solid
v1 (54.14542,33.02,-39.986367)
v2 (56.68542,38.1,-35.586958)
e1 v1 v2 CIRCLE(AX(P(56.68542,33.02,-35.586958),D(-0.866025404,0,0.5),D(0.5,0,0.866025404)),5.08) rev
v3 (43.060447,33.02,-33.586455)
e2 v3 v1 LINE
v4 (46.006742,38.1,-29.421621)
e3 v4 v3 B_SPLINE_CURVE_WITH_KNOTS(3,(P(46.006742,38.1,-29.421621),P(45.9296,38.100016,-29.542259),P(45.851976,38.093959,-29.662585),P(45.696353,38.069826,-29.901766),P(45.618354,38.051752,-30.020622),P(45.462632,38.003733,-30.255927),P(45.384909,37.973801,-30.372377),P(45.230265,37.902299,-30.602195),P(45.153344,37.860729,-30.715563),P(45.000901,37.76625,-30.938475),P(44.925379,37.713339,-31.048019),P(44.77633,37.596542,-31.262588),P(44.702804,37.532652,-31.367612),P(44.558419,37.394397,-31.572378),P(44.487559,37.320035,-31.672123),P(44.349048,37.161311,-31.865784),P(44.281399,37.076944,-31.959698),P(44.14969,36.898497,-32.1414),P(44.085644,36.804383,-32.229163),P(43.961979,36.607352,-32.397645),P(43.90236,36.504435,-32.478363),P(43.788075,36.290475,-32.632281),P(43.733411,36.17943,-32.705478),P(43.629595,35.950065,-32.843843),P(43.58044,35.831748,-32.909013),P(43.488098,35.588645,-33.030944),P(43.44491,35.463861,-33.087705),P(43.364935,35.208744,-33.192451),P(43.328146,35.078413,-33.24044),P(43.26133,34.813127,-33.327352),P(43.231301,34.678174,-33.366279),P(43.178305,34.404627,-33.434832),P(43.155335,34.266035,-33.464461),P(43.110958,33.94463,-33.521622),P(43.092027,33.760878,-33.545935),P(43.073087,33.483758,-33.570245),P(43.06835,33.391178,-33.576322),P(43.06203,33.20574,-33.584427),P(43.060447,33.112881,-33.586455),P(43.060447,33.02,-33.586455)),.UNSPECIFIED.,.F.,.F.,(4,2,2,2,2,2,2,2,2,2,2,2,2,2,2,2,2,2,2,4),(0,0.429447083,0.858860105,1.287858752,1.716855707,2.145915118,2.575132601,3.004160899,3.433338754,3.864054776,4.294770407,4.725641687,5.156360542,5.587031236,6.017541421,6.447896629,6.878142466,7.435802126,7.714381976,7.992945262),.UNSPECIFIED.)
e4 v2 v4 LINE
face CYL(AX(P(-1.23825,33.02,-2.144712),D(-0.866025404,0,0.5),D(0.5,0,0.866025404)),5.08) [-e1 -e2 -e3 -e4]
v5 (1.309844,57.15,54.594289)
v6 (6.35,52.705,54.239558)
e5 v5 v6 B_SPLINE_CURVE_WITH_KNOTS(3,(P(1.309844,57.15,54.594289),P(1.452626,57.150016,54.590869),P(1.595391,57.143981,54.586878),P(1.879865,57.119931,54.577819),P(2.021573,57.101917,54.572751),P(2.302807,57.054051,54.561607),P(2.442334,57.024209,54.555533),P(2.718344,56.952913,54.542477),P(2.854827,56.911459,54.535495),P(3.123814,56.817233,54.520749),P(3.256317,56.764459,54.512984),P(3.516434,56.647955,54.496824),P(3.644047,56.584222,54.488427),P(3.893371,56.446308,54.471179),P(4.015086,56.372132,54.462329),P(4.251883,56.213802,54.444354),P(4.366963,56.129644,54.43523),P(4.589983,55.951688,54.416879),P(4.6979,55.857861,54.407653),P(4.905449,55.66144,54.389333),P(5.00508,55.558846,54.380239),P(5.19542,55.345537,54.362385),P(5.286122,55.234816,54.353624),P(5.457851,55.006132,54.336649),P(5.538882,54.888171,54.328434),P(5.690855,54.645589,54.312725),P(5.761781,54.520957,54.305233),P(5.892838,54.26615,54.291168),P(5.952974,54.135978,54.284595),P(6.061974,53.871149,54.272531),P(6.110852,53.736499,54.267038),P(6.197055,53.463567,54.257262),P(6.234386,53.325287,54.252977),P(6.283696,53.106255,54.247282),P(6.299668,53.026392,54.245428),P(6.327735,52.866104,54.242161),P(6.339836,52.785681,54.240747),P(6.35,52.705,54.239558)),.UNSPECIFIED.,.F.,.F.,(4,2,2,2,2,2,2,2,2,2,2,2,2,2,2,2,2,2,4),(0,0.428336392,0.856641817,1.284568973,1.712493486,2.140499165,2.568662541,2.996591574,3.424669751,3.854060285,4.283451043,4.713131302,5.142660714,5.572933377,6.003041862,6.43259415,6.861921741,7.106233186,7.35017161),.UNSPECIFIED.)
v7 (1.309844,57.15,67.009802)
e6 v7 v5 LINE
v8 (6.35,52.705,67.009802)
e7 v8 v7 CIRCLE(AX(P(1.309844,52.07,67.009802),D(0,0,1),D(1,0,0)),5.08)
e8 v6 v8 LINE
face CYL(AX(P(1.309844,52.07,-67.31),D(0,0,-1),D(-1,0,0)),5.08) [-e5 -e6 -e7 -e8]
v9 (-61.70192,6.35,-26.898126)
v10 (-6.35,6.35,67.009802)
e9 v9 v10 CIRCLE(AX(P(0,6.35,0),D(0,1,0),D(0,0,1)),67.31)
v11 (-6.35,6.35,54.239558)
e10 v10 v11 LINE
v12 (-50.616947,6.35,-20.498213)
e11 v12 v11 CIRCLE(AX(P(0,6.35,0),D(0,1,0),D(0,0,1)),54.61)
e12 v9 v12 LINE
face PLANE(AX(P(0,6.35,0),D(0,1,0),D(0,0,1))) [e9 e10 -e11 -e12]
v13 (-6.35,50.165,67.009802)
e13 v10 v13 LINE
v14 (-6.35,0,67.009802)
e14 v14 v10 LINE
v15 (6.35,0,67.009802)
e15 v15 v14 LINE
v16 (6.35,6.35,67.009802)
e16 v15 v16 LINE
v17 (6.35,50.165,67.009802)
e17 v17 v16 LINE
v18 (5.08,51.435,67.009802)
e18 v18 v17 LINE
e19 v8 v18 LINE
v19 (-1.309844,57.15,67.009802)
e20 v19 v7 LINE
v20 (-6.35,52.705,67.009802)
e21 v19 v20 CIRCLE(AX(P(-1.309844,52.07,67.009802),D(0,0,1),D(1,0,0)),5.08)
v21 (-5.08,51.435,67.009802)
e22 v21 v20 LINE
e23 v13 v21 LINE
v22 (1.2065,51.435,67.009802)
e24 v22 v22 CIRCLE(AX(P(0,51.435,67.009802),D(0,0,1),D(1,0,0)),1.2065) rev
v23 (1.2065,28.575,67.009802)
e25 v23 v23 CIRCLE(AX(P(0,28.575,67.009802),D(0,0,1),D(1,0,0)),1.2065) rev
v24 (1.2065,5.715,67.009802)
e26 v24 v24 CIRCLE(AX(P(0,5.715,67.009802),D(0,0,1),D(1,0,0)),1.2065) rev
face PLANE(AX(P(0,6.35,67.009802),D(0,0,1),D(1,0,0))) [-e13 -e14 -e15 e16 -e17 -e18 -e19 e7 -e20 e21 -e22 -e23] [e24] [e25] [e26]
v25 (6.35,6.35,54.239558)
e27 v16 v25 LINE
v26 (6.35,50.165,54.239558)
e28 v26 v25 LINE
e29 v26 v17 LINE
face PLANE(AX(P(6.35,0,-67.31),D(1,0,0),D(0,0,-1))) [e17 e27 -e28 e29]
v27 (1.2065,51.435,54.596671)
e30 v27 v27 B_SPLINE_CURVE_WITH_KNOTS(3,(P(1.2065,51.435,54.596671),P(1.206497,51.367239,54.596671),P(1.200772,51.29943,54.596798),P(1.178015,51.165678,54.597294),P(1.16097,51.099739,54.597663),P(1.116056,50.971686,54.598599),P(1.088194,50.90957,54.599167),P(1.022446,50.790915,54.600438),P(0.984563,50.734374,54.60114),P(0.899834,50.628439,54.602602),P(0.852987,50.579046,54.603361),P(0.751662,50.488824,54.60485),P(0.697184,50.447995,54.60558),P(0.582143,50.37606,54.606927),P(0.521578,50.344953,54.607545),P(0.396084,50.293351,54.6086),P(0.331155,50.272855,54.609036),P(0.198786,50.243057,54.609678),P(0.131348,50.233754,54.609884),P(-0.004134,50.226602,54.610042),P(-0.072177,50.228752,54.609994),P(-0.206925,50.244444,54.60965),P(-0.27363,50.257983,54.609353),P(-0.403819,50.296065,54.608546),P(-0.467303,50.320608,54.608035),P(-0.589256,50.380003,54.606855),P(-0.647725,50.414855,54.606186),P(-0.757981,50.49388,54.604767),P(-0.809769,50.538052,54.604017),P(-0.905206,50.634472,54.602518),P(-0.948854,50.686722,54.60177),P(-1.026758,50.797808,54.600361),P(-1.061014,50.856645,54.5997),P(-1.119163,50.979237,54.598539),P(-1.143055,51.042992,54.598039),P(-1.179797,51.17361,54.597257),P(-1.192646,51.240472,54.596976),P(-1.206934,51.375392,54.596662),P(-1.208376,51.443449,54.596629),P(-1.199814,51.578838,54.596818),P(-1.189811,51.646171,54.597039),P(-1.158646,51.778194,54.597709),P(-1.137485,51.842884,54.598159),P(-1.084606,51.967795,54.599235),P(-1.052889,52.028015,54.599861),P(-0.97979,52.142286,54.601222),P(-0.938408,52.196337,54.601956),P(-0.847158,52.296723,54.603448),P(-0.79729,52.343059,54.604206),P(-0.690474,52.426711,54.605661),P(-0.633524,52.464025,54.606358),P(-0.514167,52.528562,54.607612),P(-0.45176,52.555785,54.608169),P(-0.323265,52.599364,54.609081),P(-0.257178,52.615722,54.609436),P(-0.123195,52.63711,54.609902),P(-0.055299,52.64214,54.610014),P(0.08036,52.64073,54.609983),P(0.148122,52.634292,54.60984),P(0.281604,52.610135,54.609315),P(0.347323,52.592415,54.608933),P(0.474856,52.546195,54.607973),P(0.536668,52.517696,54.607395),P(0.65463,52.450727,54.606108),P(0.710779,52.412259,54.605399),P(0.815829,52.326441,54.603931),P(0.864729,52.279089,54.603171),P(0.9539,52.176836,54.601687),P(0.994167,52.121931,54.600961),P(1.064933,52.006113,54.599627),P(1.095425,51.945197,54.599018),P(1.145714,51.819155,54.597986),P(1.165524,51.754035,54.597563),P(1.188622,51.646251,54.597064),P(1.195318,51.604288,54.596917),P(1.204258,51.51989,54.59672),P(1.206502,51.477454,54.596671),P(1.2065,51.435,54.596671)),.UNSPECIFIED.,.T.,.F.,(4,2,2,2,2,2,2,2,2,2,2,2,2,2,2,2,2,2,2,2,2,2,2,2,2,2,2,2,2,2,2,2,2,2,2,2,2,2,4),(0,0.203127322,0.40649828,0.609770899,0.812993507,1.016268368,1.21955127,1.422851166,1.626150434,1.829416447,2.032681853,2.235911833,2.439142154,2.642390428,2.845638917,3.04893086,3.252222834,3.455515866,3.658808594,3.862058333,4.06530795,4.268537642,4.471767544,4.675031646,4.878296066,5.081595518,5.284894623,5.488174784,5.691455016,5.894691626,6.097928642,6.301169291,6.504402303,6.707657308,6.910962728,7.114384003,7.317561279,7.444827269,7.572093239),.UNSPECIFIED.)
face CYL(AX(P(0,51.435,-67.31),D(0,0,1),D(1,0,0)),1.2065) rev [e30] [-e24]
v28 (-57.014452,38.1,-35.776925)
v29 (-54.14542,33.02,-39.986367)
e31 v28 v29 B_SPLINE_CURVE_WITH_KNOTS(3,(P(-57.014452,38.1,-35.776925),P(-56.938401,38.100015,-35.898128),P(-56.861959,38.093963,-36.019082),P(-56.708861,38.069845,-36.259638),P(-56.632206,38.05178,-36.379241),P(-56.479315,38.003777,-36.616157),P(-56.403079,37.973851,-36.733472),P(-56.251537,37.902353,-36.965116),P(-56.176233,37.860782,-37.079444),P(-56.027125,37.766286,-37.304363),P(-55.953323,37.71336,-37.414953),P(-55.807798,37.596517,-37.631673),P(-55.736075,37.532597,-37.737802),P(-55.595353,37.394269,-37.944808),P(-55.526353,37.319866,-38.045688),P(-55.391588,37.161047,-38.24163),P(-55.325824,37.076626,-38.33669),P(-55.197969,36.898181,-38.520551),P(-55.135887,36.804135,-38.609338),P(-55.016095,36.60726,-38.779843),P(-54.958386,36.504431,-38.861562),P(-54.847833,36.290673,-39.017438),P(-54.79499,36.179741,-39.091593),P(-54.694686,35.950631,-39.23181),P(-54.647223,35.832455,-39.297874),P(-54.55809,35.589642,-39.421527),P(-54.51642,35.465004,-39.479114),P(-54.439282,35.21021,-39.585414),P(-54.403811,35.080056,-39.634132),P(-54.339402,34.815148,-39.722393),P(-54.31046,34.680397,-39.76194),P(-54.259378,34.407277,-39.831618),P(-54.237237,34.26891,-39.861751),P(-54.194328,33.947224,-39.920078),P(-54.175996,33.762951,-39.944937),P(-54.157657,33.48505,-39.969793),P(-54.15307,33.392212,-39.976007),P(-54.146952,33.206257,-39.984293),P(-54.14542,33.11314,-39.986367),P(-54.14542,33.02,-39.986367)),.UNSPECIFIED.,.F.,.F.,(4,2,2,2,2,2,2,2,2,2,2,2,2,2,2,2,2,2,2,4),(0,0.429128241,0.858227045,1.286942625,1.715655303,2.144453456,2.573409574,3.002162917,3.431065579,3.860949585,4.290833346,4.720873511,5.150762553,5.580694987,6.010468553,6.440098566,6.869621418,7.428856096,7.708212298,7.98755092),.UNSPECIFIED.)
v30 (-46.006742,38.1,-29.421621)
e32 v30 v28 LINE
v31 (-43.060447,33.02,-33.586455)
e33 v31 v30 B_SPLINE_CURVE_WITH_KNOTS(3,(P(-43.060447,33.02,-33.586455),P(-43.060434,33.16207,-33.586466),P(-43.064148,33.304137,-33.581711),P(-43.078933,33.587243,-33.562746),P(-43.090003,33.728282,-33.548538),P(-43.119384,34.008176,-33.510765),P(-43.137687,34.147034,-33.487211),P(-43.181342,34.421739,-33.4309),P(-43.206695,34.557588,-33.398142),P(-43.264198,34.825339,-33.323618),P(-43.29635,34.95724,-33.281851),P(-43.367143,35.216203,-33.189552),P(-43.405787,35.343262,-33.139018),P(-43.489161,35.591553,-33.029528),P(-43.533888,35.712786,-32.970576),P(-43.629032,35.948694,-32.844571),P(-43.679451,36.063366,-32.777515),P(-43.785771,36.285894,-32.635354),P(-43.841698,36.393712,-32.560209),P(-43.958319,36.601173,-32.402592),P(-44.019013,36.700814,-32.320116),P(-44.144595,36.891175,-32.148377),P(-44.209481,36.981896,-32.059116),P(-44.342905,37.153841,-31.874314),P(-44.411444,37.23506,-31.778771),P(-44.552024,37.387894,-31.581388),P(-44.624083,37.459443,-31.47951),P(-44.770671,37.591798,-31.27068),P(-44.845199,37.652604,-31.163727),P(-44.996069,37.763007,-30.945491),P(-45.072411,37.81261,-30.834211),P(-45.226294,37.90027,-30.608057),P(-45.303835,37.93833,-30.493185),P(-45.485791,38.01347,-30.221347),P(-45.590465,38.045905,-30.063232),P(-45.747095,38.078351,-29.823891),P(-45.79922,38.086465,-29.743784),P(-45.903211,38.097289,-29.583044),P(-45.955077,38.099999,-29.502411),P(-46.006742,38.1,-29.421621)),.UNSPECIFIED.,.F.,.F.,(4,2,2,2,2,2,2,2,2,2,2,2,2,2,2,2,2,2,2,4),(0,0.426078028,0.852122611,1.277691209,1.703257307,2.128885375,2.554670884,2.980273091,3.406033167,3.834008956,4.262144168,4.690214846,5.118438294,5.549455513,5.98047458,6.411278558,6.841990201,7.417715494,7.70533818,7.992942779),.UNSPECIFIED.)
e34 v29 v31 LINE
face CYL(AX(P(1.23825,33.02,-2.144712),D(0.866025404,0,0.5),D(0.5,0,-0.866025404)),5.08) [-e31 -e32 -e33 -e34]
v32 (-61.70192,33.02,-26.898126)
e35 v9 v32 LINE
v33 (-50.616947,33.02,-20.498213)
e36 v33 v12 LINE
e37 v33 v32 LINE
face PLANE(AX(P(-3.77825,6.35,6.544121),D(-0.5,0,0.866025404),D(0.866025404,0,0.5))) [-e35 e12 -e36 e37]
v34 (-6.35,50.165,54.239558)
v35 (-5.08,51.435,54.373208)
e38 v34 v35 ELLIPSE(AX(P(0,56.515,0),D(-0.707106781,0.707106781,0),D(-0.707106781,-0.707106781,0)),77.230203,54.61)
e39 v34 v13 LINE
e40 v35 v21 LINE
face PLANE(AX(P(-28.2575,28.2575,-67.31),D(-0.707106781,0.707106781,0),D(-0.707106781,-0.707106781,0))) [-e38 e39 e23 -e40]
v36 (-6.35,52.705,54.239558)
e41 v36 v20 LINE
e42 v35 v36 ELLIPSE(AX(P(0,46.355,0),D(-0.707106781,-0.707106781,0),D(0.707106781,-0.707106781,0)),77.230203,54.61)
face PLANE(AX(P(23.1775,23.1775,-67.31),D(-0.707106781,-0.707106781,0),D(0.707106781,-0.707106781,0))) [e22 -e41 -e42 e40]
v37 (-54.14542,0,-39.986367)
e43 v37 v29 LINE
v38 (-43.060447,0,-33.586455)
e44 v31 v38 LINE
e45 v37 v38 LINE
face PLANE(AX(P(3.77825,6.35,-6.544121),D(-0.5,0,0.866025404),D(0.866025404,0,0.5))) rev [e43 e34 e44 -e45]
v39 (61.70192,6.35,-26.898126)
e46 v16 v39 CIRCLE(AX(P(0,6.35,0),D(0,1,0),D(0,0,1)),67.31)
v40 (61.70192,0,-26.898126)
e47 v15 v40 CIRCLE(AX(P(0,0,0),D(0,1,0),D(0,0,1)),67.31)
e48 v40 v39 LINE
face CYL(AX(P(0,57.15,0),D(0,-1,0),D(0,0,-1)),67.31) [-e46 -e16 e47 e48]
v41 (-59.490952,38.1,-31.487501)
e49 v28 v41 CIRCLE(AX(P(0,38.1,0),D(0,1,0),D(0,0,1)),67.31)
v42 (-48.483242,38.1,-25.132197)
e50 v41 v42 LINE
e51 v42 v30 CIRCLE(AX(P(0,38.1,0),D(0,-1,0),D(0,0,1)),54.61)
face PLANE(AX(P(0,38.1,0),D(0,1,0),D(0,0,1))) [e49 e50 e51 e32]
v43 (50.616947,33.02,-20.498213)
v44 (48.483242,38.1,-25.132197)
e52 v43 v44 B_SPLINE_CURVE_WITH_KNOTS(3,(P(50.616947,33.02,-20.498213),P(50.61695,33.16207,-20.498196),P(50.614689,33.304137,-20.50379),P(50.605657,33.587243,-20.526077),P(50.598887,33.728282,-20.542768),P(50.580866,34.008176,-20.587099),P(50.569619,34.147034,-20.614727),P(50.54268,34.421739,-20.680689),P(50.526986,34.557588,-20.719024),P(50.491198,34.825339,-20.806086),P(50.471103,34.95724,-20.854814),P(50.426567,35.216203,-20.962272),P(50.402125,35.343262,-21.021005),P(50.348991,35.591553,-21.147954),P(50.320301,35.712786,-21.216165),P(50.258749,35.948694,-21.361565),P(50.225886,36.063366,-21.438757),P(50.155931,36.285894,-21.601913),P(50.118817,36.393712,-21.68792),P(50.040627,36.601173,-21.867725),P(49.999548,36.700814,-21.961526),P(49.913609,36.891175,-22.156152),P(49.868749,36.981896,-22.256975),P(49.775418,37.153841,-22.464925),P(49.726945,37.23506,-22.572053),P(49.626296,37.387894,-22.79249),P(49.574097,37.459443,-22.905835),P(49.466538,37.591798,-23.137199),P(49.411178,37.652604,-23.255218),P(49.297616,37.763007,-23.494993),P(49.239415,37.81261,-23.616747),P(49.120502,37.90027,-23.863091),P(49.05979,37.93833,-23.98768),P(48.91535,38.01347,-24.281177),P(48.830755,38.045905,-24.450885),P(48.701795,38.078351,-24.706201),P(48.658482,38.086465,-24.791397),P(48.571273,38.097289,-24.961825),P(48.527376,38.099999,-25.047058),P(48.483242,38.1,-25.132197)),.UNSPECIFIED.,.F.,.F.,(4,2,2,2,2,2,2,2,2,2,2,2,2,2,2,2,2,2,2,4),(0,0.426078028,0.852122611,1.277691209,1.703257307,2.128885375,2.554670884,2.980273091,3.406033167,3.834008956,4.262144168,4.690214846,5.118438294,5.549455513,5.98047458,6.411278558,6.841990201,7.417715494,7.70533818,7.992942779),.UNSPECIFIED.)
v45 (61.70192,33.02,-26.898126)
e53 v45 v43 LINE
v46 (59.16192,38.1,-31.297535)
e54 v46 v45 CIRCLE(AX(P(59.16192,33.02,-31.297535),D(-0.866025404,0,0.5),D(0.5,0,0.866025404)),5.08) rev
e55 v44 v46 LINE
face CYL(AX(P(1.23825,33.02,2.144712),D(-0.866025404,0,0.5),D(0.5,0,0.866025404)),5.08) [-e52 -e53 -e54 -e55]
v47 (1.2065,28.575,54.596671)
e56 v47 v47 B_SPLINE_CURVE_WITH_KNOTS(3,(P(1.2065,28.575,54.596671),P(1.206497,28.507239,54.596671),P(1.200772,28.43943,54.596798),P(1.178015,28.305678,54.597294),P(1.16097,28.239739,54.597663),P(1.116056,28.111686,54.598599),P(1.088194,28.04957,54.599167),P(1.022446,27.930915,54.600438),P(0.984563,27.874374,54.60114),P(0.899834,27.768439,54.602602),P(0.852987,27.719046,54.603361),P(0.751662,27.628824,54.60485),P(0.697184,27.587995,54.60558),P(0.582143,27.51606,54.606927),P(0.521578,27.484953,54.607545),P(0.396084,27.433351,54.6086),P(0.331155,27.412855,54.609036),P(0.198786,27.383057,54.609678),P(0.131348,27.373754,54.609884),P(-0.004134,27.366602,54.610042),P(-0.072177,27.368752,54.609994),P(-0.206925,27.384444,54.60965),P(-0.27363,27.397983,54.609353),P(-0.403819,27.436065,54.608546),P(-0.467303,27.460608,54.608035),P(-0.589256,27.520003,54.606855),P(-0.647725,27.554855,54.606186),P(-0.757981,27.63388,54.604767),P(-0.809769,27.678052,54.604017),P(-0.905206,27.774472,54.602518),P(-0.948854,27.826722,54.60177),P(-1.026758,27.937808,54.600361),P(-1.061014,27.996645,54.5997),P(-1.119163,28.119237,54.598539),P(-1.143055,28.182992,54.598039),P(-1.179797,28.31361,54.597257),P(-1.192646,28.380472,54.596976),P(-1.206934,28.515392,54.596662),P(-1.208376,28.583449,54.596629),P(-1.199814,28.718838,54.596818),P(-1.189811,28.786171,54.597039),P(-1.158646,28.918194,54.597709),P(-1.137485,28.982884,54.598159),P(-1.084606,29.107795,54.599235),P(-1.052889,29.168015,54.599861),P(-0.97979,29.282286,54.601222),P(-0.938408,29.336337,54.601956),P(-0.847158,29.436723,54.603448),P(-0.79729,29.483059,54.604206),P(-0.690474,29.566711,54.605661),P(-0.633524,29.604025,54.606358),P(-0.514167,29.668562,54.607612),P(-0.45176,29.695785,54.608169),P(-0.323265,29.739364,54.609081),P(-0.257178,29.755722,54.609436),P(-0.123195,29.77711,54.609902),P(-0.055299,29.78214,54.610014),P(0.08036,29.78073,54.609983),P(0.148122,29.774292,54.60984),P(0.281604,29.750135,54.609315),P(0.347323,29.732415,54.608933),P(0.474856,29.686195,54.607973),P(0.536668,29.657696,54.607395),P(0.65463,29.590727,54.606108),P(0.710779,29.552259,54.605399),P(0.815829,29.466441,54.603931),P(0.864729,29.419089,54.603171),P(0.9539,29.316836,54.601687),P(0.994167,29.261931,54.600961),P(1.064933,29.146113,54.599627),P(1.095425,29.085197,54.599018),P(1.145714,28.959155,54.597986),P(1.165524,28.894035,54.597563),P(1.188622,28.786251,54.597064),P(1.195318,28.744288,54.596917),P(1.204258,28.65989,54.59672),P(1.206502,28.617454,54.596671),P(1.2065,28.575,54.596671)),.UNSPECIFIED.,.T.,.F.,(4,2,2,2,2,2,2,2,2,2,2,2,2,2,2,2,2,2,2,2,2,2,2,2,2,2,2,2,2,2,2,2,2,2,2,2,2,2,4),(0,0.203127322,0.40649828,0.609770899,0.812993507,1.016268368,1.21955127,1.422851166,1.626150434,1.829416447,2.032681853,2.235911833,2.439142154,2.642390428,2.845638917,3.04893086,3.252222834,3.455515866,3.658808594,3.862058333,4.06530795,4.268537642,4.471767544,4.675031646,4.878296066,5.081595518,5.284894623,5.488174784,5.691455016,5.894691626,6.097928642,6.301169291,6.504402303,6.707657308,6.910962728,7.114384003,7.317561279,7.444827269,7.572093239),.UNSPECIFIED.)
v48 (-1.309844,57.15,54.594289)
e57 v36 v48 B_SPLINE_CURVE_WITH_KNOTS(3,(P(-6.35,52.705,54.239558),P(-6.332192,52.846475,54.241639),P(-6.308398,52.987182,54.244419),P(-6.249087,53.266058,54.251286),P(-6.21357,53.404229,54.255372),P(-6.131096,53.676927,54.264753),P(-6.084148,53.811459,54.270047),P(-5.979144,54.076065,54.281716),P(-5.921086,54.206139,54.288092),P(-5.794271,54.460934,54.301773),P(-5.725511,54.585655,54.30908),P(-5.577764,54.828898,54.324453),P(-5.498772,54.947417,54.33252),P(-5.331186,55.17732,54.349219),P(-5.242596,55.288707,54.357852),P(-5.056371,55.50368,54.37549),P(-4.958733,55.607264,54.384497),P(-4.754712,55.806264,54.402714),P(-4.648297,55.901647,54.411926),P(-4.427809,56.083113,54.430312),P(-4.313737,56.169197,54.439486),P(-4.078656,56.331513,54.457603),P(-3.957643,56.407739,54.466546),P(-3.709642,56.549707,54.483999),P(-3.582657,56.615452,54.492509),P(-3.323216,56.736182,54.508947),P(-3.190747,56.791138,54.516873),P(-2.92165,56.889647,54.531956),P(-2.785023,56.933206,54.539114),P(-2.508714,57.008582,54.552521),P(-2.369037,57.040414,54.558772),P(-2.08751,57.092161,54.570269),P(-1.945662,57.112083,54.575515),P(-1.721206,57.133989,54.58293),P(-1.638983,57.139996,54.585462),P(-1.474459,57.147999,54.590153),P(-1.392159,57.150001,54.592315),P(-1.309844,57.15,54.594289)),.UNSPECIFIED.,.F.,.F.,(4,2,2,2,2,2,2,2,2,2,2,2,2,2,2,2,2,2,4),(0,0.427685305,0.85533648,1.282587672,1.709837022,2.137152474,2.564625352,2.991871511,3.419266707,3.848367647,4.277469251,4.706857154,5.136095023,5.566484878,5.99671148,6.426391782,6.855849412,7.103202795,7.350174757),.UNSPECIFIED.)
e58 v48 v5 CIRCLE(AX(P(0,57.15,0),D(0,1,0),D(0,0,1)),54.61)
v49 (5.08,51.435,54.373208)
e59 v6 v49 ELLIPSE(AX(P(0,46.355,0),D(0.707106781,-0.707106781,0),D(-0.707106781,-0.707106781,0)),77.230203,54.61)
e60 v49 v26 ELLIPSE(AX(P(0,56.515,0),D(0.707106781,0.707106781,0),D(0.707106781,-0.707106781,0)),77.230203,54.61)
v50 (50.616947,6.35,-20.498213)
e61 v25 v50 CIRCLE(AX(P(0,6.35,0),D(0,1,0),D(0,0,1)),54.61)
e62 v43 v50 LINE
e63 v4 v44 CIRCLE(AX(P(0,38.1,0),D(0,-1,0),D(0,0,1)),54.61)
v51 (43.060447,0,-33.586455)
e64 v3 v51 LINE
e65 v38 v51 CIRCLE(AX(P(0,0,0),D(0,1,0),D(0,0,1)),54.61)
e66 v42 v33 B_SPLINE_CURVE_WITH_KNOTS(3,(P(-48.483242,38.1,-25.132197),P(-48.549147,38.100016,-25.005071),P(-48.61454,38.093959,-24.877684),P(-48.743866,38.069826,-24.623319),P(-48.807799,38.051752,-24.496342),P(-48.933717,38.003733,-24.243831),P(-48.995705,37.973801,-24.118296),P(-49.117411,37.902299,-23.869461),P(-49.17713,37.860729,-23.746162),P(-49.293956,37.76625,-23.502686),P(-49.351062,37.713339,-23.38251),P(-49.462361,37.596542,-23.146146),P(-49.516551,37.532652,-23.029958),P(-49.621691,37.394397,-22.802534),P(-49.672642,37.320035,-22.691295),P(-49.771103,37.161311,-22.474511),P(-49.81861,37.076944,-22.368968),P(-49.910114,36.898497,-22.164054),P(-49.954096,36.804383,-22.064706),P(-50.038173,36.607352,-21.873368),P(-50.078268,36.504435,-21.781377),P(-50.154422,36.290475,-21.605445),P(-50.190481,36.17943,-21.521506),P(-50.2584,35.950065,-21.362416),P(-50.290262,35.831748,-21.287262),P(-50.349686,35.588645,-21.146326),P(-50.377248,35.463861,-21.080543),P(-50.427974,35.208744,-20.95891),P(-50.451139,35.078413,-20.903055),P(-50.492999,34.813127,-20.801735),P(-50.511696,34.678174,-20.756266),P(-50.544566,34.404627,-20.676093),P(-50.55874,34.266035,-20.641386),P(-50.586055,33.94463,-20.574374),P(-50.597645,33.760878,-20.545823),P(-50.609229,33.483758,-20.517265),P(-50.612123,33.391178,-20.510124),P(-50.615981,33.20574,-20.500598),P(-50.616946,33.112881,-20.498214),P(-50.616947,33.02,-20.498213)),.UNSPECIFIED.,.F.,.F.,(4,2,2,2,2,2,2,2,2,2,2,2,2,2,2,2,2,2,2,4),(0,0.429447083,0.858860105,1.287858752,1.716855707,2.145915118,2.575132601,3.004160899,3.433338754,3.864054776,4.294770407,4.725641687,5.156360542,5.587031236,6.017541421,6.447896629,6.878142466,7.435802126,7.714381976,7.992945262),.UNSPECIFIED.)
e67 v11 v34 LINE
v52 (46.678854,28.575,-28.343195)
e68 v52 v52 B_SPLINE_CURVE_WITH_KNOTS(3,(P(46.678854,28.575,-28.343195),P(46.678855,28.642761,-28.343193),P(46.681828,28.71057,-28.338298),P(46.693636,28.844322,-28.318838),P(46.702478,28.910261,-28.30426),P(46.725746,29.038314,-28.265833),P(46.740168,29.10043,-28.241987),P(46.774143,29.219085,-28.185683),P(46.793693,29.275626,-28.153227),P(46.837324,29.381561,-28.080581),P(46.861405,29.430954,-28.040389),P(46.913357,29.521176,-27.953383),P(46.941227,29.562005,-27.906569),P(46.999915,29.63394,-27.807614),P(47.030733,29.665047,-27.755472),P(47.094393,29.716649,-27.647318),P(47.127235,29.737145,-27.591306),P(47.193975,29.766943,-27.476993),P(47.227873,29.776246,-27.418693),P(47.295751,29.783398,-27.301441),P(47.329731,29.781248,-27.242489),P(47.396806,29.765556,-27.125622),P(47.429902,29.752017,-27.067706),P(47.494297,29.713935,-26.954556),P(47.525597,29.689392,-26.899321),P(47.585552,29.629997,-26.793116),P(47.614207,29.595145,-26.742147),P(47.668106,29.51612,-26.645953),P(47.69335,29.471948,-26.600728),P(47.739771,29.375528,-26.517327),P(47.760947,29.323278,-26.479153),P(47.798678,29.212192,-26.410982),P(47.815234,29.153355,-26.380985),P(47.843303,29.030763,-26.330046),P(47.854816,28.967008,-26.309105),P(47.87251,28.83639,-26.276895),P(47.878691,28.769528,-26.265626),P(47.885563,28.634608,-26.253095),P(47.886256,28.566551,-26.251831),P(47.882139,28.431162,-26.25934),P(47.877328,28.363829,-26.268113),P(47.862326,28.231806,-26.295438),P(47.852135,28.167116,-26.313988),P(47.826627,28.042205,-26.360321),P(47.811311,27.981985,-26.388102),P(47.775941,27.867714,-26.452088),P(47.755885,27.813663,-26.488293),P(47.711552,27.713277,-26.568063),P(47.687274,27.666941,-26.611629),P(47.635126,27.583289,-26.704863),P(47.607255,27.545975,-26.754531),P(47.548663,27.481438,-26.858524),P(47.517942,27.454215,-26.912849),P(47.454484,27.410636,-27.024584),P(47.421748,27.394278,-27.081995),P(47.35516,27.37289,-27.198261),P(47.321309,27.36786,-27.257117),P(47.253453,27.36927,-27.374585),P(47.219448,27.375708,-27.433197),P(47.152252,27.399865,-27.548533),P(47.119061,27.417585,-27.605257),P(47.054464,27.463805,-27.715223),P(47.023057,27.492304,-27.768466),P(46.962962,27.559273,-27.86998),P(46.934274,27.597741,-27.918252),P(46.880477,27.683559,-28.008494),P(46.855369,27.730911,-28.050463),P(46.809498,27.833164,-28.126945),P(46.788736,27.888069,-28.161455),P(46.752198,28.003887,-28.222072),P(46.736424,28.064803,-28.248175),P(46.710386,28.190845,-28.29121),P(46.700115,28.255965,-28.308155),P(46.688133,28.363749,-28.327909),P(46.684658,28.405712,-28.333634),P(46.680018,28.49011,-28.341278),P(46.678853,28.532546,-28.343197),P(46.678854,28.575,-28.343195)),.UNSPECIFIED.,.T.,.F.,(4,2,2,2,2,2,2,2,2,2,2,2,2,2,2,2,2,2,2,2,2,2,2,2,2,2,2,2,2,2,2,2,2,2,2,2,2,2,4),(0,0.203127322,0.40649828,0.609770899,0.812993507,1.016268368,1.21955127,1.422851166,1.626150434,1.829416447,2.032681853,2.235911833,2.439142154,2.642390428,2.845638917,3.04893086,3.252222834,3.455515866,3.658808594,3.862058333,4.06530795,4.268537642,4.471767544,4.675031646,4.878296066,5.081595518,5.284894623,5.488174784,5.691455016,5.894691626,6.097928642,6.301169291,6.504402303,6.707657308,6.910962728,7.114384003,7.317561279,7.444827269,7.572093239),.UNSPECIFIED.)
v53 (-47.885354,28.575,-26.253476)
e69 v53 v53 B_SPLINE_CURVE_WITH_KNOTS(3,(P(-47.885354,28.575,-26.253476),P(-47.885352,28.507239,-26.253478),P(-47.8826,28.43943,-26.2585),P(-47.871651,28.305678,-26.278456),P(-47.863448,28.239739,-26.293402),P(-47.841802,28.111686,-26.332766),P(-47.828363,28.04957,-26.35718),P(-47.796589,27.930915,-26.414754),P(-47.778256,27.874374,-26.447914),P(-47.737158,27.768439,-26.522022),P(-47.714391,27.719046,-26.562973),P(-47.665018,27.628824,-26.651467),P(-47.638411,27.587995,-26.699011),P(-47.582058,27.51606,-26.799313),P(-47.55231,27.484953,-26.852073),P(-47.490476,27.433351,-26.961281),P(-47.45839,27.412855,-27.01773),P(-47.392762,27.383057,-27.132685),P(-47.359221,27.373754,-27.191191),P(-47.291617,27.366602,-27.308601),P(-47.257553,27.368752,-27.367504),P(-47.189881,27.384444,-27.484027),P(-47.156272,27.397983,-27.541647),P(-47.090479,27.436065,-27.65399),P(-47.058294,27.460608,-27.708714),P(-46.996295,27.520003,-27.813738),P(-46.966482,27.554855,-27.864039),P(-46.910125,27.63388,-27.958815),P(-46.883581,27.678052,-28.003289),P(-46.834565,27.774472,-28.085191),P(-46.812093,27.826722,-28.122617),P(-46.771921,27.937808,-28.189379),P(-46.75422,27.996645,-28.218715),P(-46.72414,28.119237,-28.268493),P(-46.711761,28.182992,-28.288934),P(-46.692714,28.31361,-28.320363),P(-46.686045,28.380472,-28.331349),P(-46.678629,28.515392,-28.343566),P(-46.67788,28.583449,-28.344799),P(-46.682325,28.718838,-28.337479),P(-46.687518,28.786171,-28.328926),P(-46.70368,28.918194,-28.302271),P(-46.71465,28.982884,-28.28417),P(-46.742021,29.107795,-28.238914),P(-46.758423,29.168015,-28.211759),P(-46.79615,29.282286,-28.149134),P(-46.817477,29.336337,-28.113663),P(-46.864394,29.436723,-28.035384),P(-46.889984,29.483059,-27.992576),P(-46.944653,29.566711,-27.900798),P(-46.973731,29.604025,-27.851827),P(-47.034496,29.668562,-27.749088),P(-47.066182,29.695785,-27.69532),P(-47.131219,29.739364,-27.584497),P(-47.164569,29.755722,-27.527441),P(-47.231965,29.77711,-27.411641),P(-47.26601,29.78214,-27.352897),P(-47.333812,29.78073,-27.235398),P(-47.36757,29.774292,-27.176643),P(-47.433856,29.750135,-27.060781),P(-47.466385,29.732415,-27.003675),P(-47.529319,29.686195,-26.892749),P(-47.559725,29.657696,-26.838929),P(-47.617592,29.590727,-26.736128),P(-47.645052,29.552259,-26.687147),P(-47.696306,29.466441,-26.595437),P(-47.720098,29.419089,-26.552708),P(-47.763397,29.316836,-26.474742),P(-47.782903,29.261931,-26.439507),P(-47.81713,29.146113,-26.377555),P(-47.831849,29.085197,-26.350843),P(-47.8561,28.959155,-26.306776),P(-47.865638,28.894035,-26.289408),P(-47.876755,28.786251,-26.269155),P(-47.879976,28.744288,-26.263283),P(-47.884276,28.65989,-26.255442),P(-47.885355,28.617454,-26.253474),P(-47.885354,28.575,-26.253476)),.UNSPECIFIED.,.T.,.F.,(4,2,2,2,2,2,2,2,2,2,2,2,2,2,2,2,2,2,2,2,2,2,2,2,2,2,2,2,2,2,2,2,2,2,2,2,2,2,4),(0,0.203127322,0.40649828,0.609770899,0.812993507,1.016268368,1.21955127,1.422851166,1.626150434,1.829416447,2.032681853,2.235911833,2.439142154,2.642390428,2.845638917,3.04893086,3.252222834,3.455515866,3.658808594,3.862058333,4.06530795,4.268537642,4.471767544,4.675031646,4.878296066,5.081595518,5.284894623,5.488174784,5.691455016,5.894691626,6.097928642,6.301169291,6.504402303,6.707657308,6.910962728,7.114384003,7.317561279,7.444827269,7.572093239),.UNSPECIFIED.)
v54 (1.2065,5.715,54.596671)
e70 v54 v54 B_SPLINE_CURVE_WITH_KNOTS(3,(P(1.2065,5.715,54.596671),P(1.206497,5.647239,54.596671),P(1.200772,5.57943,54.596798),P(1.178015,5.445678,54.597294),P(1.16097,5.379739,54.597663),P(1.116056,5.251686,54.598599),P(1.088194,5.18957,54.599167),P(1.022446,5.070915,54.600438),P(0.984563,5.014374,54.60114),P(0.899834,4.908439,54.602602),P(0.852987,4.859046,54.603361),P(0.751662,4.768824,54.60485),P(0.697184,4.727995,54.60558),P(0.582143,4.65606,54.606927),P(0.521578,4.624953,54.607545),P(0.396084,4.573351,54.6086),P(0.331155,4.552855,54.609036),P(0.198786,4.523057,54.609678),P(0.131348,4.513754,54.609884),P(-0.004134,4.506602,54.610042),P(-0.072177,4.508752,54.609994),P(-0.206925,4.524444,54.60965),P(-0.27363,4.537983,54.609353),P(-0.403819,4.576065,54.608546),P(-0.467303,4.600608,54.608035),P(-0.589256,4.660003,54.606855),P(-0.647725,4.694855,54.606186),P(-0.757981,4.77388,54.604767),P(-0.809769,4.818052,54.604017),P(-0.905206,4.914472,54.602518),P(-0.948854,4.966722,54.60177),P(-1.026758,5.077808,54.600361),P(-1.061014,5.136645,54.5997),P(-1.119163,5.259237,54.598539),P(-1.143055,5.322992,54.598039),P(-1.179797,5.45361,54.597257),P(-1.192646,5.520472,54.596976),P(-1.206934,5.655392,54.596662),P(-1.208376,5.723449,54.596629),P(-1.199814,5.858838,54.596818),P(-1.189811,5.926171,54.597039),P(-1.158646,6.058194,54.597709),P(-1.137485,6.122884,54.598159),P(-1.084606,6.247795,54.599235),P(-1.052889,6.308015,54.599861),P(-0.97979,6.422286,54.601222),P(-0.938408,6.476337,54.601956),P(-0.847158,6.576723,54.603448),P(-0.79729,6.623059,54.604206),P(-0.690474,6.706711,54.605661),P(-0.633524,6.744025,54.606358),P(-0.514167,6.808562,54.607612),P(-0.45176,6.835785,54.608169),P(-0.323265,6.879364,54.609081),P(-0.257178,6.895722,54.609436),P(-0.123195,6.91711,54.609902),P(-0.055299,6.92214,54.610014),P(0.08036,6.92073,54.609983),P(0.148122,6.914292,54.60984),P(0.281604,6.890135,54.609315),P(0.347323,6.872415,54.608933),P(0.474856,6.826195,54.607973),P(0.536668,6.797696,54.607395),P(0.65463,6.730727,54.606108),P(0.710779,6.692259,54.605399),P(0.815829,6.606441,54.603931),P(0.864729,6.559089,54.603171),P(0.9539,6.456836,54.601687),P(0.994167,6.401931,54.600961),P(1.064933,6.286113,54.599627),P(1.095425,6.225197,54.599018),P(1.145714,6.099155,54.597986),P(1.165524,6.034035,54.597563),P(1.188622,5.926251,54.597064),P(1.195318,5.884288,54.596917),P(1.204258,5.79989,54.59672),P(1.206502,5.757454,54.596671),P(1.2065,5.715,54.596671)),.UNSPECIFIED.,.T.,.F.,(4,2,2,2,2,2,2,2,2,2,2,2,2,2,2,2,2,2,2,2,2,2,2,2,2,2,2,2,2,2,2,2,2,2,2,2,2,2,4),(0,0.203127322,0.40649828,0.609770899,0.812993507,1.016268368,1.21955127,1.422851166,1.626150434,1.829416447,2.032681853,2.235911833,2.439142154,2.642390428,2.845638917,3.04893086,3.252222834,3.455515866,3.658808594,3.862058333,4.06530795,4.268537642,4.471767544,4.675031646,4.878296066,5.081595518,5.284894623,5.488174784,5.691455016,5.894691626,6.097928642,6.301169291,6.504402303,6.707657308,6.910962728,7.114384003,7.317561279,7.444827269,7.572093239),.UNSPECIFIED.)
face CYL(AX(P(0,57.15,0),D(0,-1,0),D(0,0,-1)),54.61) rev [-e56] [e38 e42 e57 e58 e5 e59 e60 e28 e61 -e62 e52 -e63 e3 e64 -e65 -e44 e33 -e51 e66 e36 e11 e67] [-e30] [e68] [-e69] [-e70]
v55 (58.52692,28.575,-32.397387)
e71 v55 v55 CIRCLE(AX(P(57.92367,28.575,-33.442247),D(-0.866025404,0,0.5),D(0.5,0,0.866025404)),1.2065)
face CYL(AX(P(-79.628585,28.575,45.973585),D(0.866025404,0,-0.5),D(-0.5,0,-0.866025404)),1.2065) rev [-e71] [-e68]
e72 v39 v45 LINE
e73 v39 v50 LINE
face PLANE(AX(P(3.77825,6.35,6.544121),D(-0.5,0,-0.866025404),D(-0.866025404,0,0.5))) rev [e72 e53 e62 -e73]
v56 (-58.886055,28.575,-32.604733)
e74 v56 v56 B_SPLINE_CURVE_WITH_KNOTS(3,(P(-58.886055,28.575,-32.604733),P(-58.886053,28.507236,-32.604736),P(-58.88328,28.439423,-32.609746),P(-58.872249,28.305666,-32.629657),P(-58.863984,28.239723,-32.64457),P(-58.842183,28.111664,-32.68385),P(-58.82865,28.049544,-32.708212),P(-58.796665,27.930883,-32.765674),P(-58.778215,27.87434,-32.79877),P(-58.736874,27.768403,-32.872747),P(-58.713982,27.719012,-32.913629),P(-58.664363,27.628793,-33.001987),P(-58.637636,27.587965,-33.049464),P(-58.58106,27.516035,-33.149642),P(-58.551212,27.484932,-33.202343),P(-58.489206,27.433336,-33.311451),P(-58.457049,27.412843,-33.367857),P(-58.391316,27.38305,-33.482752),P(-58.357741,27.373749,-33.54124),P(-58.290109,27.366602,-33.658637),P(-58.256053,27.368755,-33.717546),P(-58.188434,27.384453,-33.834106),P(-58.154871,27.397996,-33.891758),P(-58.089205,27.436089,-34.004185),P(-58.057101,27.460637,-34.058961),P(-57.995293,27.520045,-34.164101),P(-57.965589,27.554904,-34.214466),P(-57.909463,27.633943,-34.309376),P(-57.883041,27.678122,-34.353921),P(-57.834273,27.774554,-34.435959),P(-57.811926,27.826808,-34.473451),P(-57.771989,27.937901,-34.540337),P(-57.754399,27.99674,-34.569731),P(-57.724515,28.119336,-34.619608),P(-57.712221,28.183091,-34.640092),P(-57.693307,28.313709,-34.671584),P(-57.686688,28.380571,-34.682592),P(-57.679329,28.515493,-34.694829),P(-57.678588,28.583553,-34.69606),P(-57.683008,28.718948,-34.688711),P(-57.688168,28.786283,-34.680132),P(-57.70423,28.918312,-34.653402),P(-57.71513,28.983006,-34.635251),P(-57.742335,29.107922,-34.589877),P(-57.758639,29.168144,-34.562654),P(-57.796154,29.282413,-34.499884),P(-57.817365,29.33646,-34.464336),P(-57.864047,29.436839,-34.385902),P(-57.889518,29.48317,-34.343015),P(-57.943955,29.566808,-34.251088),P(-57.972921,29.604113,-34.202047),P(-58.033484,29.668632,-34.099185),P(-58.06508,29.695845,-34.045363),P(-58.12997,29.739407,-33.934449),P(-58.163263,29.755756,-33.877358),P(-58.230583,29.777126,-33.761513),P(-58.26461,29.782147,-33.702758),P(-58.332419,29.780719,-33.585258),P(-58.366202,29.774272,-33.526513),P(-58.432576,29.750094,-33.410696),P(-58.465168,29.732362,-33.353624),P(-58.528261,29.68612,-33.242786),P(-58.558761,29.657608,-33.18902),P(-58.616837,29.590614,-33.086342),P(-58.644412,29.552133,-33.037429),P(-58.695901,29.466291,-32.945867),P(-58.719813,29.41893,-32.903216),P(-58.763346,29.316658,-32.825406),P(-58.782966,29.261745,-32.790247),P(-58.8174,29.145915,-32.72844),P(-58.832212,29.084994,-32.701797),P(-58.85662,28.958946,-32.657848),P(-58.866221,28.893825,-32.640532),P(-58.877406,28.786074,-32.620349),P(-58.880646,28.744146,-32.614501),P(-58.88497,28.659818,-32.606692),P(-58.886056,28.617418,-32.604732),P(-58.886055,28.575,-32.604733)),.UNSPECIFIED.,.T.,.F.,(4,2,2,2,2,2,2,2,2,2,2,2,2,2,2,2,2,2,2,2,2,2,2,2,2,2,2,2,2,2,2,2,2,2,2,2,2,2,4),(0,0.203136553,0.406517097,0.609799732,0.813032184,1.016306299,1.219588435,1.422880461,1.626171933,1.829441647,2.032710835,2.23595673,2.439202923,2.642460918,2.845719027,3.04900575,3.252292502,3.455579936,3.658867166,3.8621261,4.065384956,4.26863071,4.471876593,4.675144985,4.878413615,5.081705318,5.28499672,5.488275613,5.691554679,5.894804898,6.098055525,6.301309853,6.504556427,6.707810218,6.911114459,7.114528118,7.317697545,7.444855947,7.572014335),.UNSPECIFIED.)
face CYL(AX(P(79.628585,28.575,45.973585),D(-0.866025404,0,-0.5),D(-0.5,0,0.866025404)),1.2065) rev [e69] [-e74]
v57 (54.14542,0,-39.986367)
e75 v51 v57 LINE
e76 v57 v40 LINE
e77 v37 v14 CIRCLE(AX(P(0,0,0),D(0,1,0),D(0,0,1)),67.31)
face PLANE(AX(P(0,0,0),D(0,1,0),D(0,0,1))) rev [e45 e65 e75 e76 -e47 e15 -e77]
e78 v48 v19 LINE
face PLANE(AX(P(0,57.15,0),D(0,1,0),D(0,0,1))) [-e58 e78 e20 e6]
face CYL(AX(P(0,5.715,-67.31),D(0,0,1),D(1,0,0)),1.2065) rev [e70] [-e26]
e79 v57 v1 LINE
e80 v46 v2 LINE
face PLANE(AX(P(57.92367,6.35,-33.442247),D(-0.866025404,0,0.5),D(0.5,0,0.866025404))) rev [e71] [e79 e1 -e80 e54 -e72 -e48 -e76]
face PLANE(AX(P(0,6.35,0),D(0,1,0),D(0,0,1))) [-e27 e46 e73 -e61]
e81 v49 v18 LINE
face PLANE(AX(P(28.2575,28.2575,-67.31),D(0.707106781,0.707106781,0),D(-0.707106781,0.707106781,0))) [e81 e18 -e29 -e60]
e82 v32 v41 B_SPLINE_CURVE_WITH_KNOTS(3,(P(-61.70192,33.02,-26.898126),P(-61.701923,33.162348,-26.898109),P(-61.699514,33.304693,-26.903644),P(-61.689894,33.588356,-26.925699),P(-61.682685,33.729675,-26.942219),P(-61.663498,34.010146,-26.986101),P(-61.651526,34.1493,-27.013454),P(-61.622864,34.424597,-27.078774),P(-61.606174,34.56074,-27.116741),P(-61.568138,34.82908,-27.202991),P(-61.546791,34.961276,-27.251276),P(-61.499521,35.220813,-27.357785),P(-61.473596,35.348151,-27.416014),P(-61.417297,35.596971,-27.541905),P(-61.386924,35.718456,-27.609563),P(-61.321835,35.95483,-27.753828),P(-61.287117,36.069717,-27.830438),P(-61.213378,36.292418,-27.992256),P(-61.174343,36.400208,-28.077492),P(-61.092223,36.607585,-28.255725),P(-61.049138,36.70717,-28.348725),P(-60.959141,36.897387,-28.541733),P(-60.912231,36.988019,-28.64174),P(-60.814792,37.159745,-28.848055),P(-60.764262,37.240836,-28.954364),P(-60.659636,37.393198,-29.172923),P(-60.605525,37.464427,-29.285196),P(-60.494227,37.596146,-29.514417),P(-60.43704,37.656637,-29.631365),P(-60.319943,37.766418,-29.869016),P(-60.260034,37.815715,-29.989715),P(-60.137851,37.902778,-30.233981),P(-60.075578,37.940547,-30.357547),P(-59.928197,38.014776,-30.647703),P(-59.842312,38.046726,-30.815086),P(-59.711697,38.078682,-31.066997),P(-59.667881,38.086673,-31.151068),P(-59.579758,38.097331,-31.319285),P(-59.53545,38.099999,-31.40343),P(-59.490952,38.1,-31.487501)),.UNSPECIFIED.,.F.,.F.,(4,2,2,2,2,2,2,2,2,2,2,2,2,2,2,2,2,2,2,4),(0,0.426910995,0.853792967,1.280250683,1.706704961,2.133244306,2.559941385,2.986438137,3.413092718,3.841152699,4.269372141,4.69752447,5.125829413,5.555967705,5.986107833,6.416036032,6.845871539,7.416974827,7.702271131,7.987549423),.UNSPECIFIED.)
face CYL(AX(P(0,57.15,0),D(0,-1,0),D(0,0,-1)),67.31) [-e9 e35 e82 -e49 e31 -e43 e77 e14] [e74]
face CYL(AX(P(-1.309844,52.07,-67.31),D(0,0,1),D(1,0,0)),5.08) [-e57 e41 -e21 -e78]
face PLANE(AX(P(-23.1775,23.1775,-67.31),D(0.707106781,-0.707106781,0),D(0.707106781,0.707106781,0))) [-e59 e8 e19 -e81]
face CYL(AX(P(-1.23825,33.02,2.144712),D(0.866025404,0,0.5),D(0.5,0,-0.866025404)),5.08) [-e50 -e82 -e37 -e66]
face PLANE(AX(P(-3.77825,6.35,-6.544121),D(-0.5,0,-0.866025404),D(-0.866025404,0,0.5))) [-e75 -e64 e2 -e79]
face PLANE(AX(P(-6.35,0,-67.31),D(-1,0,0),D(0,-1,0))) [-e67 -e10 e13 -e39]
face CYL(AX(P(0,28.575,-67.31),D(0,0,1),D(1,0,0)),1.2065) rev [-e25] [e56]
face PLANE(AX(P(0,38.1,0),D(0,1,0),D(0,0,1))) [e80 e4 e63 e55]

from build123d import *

# Parameters (mm, degrees)
SKETCH1_R               = 67.31
SKETCH1_R_2             = 54.61
BOSS_EXTRUDE1_DEPTH     = 57.15
CUT_EXTRUDE1_DEPTH      = 161.994729727
CUT_EXTRUDE1_DEPTH_BACK = 161.994729727
SKETCH2_R               = 1.2065
SKETCH3_R               = 1.2065
CUT_EXTRUDE2_DEPTH      = 171.985259226
CUT_EXTRUDE3_START      = -50.8
CUT_EXTRUDE3_DEPTH      = 50.8
SKETCH5_W               = 12.7
SKETCH5_H               = 152.473493429
CUT_EXTRUDE4_DEPTH      = 50.8
CUT_EXTRUDE5_START      = -19.05
CUT_EXTRUDE5_DEPTH      = 19.05
CUT_EXTRUDE6_START      = -19.05
CUT_EXTRUDE6_DEPTH      = 19.05
FILLET1_START           = 53
FILLET1_DEPTH           = 15
FILLET1_2_DEPTH         = 15
FILLET1_START_2         = -67.31
FILLET1_3_DEPTH         = 14.31
CUT_EXTRUDE7_START      = -19.05
CUT_EXTRUDE7_DEPTH      = 19.05


with BuildPart() as part:
    # Sketch1 → Boss-Extrude1 (new body)
    with BuildSketch(Plane(origin=(0, 0, 0), x_dir=(1, 0, 0), z_dir=(0, 1, 0))):
        with Locations(Location((0, 0, 0), (0, 0, 270))):
            Circle(SKETCH1_R)
        with Locations(Location((0, 0, 0), (0, 0, 270))):
            Circle(SKETCH1_R_2, mode=Mode.SUBTRACT)
    extrude(amount=BOSS_EXTRUDE1_DEPTH)

    # Sketch2 → Cut-Extrude1 (cut, two sides: drawn at the far end of the back side and taken through both)
    with BuildSketch(Plane.XY.offset(67.31).offset(-CUT_EXTRUDE1_DEPTH_BACK)):
        Polygon((-5.08, 51.435), (-6.35, 52.705), (-6.35, 50.165), align=None)
        Polygon((-6.35, 52.705), (-6.35, 57.15), (-19.05, 57.15), (-19.05, 25.0825), (-6.35, 25.0825), (-6.35, 50.165), align=None)
        Polygon((5.08, 51.435), (6.35, 50.165), (6.35, 52.705), align=None)
        Polygon((6.35, 50.165), (6.35, 25.0825), (19.05, 25.0825), (19.05, 57.15), (6.35, 57.15), (6.35, 52.705), align=None)
        with Locations((0, 51.435)):
            Circle(SKETCH2_R)
        with Locations((0, 28.575)):
            Circle(SKETCH2_R)
        with Locations((0, 5.715)):
            Circle(SKETCH2_R)
    extrude(amount=CUT_EXTRUDE1_DEPTH + CUT_EXTRUDE1_DEPTH_BACK, mode=Mode.SUBTRACT)

    # Sketch3 → Cut-Extrude2 (cut, through all)
    with BuildSketch(Plane(origin=(-58.292169929, 0, -33.655), x_dir=(0, -1, 0), z_dir=(-0.8660254037844364, 0, -0.5000000000000041))):
        with Locations(Location((-28.575, 0, 0), (0, 0, 90))):
            Circle(SKETCH3_R)
    cut_extrude2 = extrude(amount=-CUT_EXTRUDE2_DEPTH, mode=Mode.SUBTRACT)

    # Mirror1: Cut-Extrude2 across plane
    add(cut_extrude2.mirror(Plane(origin=(0, 0, 0), x_dir=(0, 0, 1), z_dir=(1, 0, 0))), mode=Mode.SUBTRACT)

    # Cut-Extrude3: read off the stored shape, not the designer's step
    # Cut-Extrude3 outline → Cut-Extrude3 (cut)
    with BuildSketch(Plane(origin=(0, 57.15, 0), x_dir=(1, 0, 0), z_dir=(0, 1, 0)).offset(CUT_EXTRUDE3_START)):
        with BuildLine():
            ThreePointArc((-6.35, -67.009802268), (0, -67.31), (6.35, -67.009802268))
            Line((6.35, -67.009802268), (-6.35, -67.009802268))
        make_face()
        with BuildLine():
            Line((6.35, -54.23955752), (6.35, -67.009802268))
            ThreePointArc((6.35, -67.009802268), (57.986556059, -34.178873833), (61.701920082, 26.898125551))
            Line((61.701920082, 26.898125551), (50.616947204, 20.498213476))
            ThreePointArc((50.616947204, 20.498213476), (46.986613751, -27.830023862), (6.35, -54.23955752))
        make_face()
        with BuildLine():
            Line((-6.35, -67.009802268), (-6.35, -54.23955752))
            ThreePointArc((-6.35, -54.23955752), (-46.986613751, -27.830023862), (-50.616947204, 20.498213476))
            Line((-50.616947204, 20.498213476), (-61.701920082, 26.898125551))
            ThreePointArc((-61.701920082, 26.898125551), (-57.986556059, -34.178873833), (-6.35, -67.009802268))
        make_face()
        with BuildLine():
            Line((54.145420082, 39.986367478), (61.701920082, 26.898125551))
            ThreePointArc((61.701920082, 26.898125551), (58.292169929, 33.655), (54.145420082, 39.986367478))
        make_face()
        with BuildLine():
            Line((-54.145420082, 39.986367478), (-43.060447204, 33.586455403))
            ThreePointArc((-43.060447204, 33.586455403), (0, 54.61), (43.060447204, 33.586455403))
            Line((43.060447204, 33.586455403), (54.145420082, 39.986367478))
            ThreePointArc((54.145420082, 39.986367478), (0, 67.31), (-54.145420082, 39.986367478))
        make_face()
    extrude(amount=CUT_EXTRUDE3_DEPTH, mode=Mode.SUBTRACT)

    # Sketch5 → Cut-Extrude4 (cut)
    with BuildSketch(Plane(origin=(0, 6.35, 0), x_dir=(1, 0, 0), z_dir=(0, 1, 0))):
        with Locations((0, 21.997189195)):
            Rectangle(SKETCH5_W, SKETCH5_H)
    extrude(amount=-CUT_EXTRUDE4_DEPTH, mode=Mode.SUBTRACT)

    # Sketch6 → Cut-Extrude5 (cut)
    with BuildSketch(Plane(origin=(0, 57.15, 0), x_dir=(1, 0, 0), z_dir=(0, 1, 0)).offset(CUT_EXTRUDE5_START)):
        with BuildLine():
            Line((50.616947204, 20.498213476), (61.701920082, 26.898125551))
            Line((61.701920082, 26.898125551), (54.145420082, 39.986367478))
            Line((54.145420082, 39.986367478), (43.060447204, 33.586455403))
            ThreePointArc((43.060447204, 33.586455403), (47.293647301, 27.305), (50.616947204, 20.498213476))
        make_face()
        with BuildLine():
            Line((-61.701920082, 26.898125551), (-50.616947204, 20.498213476))
            ThreePointArc((-50.616947204, 20.498213476), (-47.293647301, 27.305), (-43.060447204, 33.586455403))
            Line((-43.060447204, 33.586455403), (-54.145420082, 39.986367478))
            ThreePointArc((-54.145420082, 39.986367478), (-58.292169929, 33.655), (-61.701920082, 26.898125551))
        make_face()
    extrude(amount=CUT_EXTRUDE5_DEPTH, mode=Mode.SUBTRACT)

    # Sketch7 → Cut-Extrude6 (cut)
    with BuildSketch(Plane(origin=(0, 6.35, 0), x_dir=(1, 0, 0), z_dir=(0, 1, 0)).offset(CUT_EXTRUDE6_START)):
        with BuildLine():
            Line((6.35, 67.009802268), (6.35, 54.23955752))
            ThreePointArc((6.35, 54.23955752), (26.776589215, 47.594814528), (43.060447204, 33.586455403))
            Line((43.060447204, 33.586455403), (54.145420082, 39.986367478))
            ThreePointArc((54.145420082, 39.986367478), (33.128393708, 58.593051041), (6.35, 67.009802268))
        make_face()
        with BuildLine():
            Line((-6.35, 54.23955752), (-6.35, 67.009802268))
            ThreePointArc((-6.35, 67.009802268), (-33.128393708, 58.593051041), (-54.145420082, 39.986367478))
            Line((-54.145420082, 39.986367478), (-43.060447204, 33.586455403))
            ThreePointArc((-43.060447204, 33.586455403), (-26.776589215, 47.594814528), (-6.35, 54.23955752))
        make_face()
    extrude(amount=CUT_EXTRUDE6_DEPTH, mode=Mode.SUBTRACT)

    # Fillet1: read off the stored shape, not the designer's step
    # Fillet1 outline → Fillet1 (cut)
    with BuildSketch(Plane.XY.offset(FILLET1_START)):
        with BuildLine():
            Line((6.35, 57.15), (1.309843752, 57.15))
            ThreePointArc((1.309843752, 57.15), (4.669947917, 55.88), (6.35, 52.705))
            Line((6.35, 52.705), (6.35, 57.15))
        make_face()
        with BuildLine():
            ThreePointArc((-6.35, 52.705), (-4.669947917, 55.88), (-1.309843752, 57.15))
            Line((-1.309843752, 57.15), (-6.35, 57.15))
            Line((-6.35, 57.15), (-6.35, 52.705))
        make_face()
    extrude(amount=FILLET1_DEPTH, mode=Mode.SUBTRACT)

    # Fillet1 2 outline → Fillet1 2 (cut)
    with BuildSketch(Plane(origin=(0, 0, 0), x_dir=(0.5000000000000049, 0, 0.8660254037844358), z_dir=(0.8660254037844358, 0, -0.5000000000000049)).offset(FILLET1_START)):
        with BuildLine():
            Line((7.5565, -38.1), (7.5565, -33.02))
            ThreePointArc((7.5565, -33.02), (6.068602448, -36.612102448), (2.4765, -38.1))
            Line((2.4765, -38.1), (7.5565, -38.1))
        make_face()
        with BuildLine():
            Line((-7.5565, -38.1), (-2.4765, -38.1))
            ThreePointArc((-2.4765, -38.1), (-6.068602448, -36.612102448), (-7.5565, -33.02))
            Line((-7.5565, -33.02), (-7.5565, -38.1))
        make_face()
    extrude(amount=FILLET1_2_DEPTH, mode=Mode.SUBTRACT)

    # Fillet1 3 outline → Fillet1 3 (cut)
    with BuildSketch(Plane(origin=(0, 0, 0), x_dir=(0.49999999999999956, 0, -0.8660254037844389), z_dir=(0.8660254037844388, 0, 0.4999999999999999)).offset(FILLET1_START_2)):
        with BuildLine():
            Line((7.5565, 38.1), (2.4765, 38.1))
            ThreePointArc((2.4765, 38.1), (6.068602448, 36.612102448), (7.5565, 33.02))
            Line((7.5565, 33.02), (7.5565, 38.1))
        make_face()
        with BuildLine():
            ThreePointArc((-7.5565, 33.02), (-6.068602448, 36.612102448), (-2.4765, 38.1))
            Line((-2.4765, 38.1), (-7.5565, 38.1))
            Line((-7.5565, 38.1), (-7.5565, 33.02))
        make_face()
    extrude(amount=FILLET1_3_DEPTH, mode=Mode.SUBTRACT)

    # Sketch8 → Cut-Extrude7 (cut)
    with BuildSketch(Plane(origin=(0, 6.35, 0), x_dir=(1, 0, 0), z_dir=(0, 1, 0)).offset(CUT_EXTRUDE7_START)):
        with BuildLine():
            ThreePointArc((-6.35, -67.009802268), (-3.690833292, -67.208733433), (-1.025873896, -67.302181857))
            Line((-1.025873896, -67.302181857), (-1.025873896, -67.009802268))
            Line((-1.025873896, -67.009802268), (-6.35, -67.009802268))
        make_face()
        Polygon((-1.025873896, -67.009802268), (-1.025873896, -67.302181857), (-1.551971907, -68.232150278), (0.972160244, -68.180468419), (1.025873896, -67.302181857), (1.025873896, -67.009802268), align=None)
        with BuildLine():
            Line((6.35, -67.009802268), (1.025873896, -67.009802268))
            Line((1.025873896, -67.009802268), (1.025873896, -67.302181857))
            ThreePointArc((1.025873896, -67.302181857), (3.690833292, -67.208733433), (6.35, -67.009802268))
        make_face()
        with BuildLine():
            ThreePointArc((61.701920082, 26.898125551), (58.292169929, 33.655), (54.145420082, 39.986367478))
            Line((54.145420082, 39.986367478), (61.701920082, 26.898125551))
        make_face()
    extrude(amount=CUT_EXTRUDE7_DEPTH, mode=Mode.SUBTRACT)


solid = part.part
